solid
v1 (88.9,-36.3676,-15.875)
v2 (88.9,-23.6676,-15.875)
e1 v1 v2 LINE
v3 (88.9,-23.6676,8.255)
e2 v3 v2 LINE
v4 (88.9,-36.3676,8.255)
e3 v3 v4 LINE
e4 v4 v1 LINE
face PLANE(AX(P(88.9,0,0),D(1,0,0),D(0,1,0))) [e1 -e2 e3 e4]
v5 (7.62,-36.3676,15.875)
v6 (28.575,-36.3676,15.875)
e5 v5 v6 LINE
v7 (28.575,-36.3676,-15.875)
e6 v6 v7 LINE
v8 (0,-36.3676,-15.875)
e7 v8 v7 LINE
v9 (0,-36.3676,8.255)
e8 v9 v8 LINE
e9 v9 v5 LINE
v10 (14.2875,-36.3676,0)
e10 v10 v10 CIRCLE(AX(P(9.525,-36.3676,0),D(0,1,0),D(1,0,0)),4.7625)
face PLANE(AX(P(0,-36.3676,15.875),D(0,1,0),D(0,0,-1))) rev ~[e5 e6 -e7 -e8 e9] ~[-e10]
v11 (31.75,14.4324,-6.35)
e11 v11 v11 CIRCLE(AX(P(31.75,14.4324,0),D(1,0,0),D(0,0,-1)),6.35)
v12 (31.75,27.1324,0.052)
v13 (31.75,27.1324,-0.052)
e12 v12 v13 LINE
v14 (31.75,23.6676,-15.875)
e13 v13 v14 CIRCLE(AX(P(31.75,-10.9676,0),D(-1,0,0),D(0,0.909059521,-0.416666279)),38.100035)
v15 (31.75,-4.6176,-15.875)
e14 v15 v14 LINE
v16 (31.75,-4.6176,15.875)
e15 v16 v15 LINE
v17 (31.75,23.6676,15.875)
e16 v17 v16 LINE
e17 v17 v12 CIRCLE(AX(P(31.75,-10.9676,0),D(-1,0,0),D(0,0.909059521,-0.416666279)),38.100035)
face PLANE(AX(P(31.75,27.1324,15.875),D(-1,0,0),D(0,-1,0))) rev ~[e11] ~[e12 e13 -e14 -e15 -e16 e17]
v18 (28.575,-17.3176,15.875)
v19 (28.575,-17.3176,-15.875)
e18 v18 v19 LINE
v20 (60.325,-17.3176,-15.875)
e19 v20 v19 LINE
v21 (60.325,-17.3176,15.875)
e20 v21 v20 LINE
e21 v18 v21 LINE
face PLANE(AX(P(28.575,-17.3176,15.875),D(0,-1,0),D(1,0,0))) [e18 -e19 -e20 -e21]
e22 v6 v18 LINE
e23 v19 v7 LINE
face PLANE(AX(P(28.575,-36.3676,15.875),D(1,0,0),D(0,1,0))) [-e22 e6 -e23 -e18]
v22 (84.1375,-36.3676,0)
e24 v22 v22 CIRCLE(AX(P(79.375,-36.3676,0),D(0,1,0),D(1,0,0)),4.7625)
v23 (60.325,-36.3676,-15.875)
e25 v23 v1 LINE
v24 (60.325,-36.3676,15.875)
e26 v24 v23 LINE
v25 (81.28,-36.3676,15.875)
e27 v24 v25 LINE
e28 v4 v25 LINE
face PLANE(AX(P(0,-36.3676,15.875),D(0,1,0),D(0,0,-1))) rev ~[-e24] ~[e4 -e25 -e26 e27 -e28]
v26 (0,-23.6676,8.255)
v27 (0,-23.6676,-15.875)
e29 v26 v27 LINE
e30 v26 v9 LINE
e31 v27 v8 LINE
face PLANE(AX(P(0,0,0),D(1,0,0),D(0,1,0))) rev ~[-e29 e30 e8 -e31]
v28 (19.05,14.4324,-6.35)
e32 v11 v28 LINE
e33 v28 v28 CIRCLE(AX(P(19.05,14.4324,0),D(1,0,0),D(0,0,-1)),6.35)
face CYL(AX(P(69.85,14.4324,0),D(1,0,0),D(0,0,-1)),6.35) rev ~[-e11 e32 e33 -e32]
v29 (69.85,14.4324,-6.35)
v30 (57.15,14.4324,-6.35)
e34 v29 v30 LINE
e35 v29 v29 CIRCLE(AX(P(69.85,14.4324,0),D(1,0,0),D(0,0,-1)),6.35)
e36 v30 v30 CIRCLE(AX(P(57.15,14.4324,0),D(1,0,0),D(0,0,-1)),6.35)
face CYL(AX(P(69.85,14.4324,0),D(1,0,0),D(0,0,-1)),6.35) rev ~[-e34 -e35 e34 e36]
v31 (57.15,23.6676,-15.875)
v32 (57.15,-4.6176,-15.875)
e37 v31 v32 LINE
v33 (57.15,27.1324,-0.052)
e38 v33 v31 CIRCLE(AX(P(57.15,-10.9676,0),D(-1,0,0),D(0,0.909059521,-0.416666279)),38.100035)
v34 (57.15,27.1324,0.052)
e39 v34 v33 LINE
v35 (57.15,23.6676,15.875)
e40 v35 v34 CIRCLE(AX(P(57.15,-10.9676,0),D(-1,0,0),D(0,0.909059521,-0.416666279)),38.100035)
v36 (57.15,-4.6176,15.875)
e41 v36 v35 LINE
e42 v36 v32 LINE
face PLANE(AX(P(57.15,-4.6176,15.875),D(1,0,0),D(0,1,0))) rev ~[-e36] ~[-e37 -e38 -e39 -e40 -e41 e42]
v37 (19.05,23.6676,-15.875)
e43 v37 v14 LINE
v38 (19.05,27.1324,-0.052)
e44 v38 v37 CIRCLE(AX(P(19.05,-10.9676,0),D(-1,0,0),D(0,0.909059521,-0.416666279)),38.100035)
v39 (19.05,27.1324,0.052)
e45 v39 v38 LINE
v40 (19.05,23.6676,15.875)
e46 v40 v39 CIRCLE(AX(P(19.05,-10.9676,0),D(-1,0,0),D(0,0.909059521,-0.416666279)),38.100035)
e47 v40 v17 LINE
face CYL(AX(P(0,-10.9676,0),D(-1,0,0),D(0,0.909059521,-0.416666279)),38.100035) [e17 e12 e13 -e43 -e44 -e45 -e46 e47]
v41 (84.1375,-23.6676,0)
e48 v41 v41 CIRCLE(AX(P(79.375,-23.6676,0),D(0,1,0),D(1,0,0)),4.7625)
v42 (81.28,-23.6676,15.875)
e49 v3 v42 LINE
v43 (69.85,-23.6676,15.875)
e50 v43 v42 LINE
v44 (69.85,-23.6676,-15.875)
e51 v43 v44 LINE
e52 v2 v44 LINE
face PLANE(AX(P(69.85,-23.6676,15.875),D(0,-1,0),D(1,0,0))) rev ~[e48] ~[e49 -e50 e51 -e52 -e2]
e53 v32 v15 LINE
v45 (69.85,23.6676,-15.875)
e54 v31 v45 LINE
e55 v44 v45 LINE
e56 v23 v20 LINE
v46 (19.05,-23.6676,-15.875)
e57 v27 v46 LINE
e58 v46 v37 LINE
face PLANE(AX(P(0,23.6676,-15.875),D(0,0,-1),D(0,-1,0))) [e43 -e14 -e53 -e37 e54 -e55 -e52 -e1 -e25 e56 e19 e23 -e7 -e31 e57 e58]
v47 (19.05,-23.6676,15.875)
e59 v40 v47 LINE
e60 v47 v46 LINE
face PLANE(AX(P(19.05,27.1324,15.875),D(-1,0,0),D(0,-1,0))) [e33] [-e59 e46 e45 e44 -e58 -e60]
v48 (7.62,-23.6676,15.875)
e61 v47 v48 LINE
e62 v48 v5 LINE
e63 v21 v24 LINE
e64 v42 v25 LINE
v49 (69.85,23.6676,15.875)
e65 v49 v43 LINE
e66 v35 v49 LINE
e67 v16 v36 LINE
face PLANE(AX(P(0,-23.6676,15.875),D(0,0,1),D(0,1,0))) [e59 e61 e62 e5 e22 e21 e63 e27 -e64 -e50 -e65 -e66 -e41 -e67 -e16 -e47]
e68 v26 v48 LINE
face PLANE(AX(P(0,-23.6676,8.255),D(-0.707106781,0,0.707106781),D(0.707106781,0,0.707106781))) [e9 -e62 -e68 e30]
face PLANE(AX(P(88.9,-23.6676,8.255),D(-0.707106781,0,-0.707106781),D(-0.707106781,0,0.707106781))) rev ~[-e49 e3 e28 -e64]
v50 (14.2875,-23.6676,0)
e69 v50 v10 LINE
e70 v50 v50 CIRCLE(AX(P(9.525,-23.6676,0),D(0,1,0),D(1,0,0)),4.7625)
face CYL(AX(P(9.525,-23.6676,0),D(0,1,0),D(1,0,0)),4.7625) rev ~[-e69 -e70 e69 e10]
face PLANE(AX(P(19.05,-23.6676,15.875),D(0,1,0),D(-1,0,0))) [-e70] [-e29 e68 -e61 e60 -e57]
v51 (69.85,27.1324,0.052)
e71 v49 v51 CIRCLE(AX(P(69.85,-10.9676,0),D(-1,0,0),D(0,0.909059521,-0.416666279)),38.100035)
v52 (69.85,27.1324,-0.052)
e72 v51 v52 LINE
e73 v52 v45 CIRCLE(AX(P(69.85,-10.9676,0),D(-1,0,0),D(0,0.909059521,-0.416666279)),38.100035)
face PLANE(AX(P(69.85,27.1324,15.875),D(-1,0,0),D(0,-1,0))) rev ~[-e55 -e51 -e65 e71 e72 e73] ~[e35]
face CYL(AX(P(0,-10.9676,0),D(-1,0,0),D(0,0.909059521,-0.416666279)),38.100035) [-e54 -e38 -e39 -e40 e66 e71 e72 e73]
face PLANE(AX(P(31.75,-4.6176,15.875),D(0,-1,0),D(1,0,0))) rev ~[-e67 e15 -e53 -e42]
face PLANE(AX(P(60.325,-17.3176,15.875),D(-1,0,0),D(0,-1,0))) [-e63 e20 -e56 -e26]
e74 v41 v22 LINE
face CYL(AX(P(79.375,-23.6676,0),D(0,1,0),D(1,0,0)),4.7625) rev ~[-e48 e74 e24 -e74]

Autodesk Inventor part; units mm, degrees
ref_plane "YZ Plane" through (0, 0, 0) normal (1, 0, 0) x (0, 1, 0)
ref_plane "XZ Plane" through (0, 0, 0) normal (0, 1, 0) x (-1, 0, 0)
ref_plane "XY Plane" through (0, 0, 0) normal (0, 0, 1) x (1, 0, 0)
sketch "Sketch2" plane through (0, 0, 0) normal (1, 0, 0) x (0, 1, 0)
  line L0 (-23.6676, 15.875) -> (23.6676, 15.875)
  line L1 (23.6676, 15.875) -> (23.6676, -15.875) construction
  line L2 (23.6676, -15.875) -> (-23.6676, -15.875)
  line L3 (-23.6676, -15.875) -> (-23.6676, 15.875)
  line L4 (-23.6676, 15.875) -> (23.6676, -15.875) construction
  line L5 (23.6676, 15.875) -> (-23.6676, -15.875) construction
  arc A0 (23.6676, -15.875) -> (23.6676, 15.875) centre (-10.9676, 0) ccw
  line L6 (0, 0) -> (-23.6676, 0) construction
  line L7 (27.1324, 0) -> (27.1324, -36.861) construction
  line L8 (-23.6676, 15.875) -> (-36.3676, 15.875)
  line L9 (-36.3676, 15.875) -> (-36.3676, -15.875)
  line L10 (-36.3676, -15.875) -> (-23.6676, -15.875)
  line L11 (-23.6676, -15.875) -> (-23.6676, 15.875)
  dimension "d2" = 38.1
  dimension "d4" = 31.75
  dimension "d5" = 50.8
  dimension "d6" = 12.7
extrude "Extrusion1" add sketch "Sketch2" along normal blind 88.9
sketch "Sketch3" plane through (0, -36.3676, 15.875) normal (0, 0, 1) x (1, 0, 0)
  line L0 (0, 63.5) -> (88.9, 63.5) construction
  line L1 (44.45, 63.5) -> (44.45, 0) construction
  line L2 (0, 0) -> (88.9, 0) construction
  line L3 (31.75, 31.75) -> (57.15, 31.75)
  line L4 (57.15, 31.75) -> (57.15, 63.5)
  line L5 (57.15, 63.5) -> (31.75, 63.5)
  line L6 (31.75, 63.5) -> (31.75, 31.75)
  line L7 (31.75, 31.75) -> (57.15, 63.5) construction
  line L8 (57.15, 31.75) -> (31.75, 63.5) construction
  line L9 (28.575, 19.05) -> (60.325, 19.05)
  line L10 (60.325, 19.05) -> (60.325, 0)
  line L11 (60.325, 0) -> (28.575, 0)
  line L12 (28.575, 0) -> (28.575, 19.05)
  line L13 (28.575, 19.05) -> (60.325, 0) construction
  line L14 (60.325, 19.05) -> (28.575, 0) construction
  line L15 (0, 60.0352) -> (0, 63.5) projected
  line L16 (0, 63.5) -> (19.05, 63.5)
  line L17 (19.05, 63.5) -> (19.05, 12.7)
  line L18 (19.05, 12.7) -> (0, 12.7)
  line L19 (0, 12.7) -> (0, 63.5)
  line L20 (88.9, 63.5) -> (69.85, 63.5)
  line L21 (69.85, 63.5) -> (69.85, 12.7)
  line L22 (69.85, 12.7) -> (88.9, 12.7)
  line L23 (88.9, 12.7) -> (88.9, 63.5)
  point P0 (0, 36.3676)
  point P1 (44.45, 47.625)
  point P2 (44.45, 9.525)
  dimension "d9" = 19.05
  dimension "d10" = 25.4
  dimension "d11" = 31.75
  dimension "d12" = 19.05
  dimension "d13" = 12.7
  dimension "d14" = 50.8
extrude "Extrusion2" cut sketch "Sketch3" against normal through all
sketch "Sketch4" plane through (69.85, -23.6676, 15.875) normal (1, 0, 0) x (0, 0, -1)
  circle A0 centre (15.875, 38.1) radius 6.35
  line L0 (31.75, 0) -> (0, 0) projected
  point P0 (15.875, 23.6676)
  dimension "d17" = 38.1
  dimension "d18" = 12.7
extrude "Extrusion3" cut sketch "Sketch4" against normal through all
sketch "Sketch5" plane through (0, -23.6676, 15.875) normal (0, 1, 0) x (1, 0, 0)
  circle A0 centre (9.525, 15.875) radius 4.7625
  circle A1 centre (79.375, 15.875) radius 4.7625
  line L0 (88.9, 31.75) -> (88.9, 0) projected
  line L1 (0, 0) -> (0, 31.75) projected
  line L2 (19.05, 0) -> (0, 0) projected
  line L3 (31.75, 31.75) -> (57.15, 31.75) construction
  line L4 (44.45, 31.75) -> (44.45, 0) construction
  line L5 (57.15, 0) -> (31.75, 0) construction
  line L6 (0, 7.62) -> (7.62, 0)
  line L7 (88.9, 7.62) -> (81.28, 0)
  line L8 (88.9, 0) -> (88.9, 31.75) projected
  line L9 (88.9, 7.62) -> (88.9, 0)
  line L10 (88.9, 0) -> (81.28, 0)
  line L11 (0, 7.62) -> (0, 0)
  line L12 (0, 0) -> (7.62, 0)
  point P0 (0, 15.875)
  dimension "d21" = 9.525
  dimension "d22" = 9.525
  dimension "d24" = 15.875
  dimension "d25" = 7.62
  dimension "d26" = 7.62
extrude "Extrusion4" cut sketch "Sketch5" against normal through all
properties part number "AnchorBase"
